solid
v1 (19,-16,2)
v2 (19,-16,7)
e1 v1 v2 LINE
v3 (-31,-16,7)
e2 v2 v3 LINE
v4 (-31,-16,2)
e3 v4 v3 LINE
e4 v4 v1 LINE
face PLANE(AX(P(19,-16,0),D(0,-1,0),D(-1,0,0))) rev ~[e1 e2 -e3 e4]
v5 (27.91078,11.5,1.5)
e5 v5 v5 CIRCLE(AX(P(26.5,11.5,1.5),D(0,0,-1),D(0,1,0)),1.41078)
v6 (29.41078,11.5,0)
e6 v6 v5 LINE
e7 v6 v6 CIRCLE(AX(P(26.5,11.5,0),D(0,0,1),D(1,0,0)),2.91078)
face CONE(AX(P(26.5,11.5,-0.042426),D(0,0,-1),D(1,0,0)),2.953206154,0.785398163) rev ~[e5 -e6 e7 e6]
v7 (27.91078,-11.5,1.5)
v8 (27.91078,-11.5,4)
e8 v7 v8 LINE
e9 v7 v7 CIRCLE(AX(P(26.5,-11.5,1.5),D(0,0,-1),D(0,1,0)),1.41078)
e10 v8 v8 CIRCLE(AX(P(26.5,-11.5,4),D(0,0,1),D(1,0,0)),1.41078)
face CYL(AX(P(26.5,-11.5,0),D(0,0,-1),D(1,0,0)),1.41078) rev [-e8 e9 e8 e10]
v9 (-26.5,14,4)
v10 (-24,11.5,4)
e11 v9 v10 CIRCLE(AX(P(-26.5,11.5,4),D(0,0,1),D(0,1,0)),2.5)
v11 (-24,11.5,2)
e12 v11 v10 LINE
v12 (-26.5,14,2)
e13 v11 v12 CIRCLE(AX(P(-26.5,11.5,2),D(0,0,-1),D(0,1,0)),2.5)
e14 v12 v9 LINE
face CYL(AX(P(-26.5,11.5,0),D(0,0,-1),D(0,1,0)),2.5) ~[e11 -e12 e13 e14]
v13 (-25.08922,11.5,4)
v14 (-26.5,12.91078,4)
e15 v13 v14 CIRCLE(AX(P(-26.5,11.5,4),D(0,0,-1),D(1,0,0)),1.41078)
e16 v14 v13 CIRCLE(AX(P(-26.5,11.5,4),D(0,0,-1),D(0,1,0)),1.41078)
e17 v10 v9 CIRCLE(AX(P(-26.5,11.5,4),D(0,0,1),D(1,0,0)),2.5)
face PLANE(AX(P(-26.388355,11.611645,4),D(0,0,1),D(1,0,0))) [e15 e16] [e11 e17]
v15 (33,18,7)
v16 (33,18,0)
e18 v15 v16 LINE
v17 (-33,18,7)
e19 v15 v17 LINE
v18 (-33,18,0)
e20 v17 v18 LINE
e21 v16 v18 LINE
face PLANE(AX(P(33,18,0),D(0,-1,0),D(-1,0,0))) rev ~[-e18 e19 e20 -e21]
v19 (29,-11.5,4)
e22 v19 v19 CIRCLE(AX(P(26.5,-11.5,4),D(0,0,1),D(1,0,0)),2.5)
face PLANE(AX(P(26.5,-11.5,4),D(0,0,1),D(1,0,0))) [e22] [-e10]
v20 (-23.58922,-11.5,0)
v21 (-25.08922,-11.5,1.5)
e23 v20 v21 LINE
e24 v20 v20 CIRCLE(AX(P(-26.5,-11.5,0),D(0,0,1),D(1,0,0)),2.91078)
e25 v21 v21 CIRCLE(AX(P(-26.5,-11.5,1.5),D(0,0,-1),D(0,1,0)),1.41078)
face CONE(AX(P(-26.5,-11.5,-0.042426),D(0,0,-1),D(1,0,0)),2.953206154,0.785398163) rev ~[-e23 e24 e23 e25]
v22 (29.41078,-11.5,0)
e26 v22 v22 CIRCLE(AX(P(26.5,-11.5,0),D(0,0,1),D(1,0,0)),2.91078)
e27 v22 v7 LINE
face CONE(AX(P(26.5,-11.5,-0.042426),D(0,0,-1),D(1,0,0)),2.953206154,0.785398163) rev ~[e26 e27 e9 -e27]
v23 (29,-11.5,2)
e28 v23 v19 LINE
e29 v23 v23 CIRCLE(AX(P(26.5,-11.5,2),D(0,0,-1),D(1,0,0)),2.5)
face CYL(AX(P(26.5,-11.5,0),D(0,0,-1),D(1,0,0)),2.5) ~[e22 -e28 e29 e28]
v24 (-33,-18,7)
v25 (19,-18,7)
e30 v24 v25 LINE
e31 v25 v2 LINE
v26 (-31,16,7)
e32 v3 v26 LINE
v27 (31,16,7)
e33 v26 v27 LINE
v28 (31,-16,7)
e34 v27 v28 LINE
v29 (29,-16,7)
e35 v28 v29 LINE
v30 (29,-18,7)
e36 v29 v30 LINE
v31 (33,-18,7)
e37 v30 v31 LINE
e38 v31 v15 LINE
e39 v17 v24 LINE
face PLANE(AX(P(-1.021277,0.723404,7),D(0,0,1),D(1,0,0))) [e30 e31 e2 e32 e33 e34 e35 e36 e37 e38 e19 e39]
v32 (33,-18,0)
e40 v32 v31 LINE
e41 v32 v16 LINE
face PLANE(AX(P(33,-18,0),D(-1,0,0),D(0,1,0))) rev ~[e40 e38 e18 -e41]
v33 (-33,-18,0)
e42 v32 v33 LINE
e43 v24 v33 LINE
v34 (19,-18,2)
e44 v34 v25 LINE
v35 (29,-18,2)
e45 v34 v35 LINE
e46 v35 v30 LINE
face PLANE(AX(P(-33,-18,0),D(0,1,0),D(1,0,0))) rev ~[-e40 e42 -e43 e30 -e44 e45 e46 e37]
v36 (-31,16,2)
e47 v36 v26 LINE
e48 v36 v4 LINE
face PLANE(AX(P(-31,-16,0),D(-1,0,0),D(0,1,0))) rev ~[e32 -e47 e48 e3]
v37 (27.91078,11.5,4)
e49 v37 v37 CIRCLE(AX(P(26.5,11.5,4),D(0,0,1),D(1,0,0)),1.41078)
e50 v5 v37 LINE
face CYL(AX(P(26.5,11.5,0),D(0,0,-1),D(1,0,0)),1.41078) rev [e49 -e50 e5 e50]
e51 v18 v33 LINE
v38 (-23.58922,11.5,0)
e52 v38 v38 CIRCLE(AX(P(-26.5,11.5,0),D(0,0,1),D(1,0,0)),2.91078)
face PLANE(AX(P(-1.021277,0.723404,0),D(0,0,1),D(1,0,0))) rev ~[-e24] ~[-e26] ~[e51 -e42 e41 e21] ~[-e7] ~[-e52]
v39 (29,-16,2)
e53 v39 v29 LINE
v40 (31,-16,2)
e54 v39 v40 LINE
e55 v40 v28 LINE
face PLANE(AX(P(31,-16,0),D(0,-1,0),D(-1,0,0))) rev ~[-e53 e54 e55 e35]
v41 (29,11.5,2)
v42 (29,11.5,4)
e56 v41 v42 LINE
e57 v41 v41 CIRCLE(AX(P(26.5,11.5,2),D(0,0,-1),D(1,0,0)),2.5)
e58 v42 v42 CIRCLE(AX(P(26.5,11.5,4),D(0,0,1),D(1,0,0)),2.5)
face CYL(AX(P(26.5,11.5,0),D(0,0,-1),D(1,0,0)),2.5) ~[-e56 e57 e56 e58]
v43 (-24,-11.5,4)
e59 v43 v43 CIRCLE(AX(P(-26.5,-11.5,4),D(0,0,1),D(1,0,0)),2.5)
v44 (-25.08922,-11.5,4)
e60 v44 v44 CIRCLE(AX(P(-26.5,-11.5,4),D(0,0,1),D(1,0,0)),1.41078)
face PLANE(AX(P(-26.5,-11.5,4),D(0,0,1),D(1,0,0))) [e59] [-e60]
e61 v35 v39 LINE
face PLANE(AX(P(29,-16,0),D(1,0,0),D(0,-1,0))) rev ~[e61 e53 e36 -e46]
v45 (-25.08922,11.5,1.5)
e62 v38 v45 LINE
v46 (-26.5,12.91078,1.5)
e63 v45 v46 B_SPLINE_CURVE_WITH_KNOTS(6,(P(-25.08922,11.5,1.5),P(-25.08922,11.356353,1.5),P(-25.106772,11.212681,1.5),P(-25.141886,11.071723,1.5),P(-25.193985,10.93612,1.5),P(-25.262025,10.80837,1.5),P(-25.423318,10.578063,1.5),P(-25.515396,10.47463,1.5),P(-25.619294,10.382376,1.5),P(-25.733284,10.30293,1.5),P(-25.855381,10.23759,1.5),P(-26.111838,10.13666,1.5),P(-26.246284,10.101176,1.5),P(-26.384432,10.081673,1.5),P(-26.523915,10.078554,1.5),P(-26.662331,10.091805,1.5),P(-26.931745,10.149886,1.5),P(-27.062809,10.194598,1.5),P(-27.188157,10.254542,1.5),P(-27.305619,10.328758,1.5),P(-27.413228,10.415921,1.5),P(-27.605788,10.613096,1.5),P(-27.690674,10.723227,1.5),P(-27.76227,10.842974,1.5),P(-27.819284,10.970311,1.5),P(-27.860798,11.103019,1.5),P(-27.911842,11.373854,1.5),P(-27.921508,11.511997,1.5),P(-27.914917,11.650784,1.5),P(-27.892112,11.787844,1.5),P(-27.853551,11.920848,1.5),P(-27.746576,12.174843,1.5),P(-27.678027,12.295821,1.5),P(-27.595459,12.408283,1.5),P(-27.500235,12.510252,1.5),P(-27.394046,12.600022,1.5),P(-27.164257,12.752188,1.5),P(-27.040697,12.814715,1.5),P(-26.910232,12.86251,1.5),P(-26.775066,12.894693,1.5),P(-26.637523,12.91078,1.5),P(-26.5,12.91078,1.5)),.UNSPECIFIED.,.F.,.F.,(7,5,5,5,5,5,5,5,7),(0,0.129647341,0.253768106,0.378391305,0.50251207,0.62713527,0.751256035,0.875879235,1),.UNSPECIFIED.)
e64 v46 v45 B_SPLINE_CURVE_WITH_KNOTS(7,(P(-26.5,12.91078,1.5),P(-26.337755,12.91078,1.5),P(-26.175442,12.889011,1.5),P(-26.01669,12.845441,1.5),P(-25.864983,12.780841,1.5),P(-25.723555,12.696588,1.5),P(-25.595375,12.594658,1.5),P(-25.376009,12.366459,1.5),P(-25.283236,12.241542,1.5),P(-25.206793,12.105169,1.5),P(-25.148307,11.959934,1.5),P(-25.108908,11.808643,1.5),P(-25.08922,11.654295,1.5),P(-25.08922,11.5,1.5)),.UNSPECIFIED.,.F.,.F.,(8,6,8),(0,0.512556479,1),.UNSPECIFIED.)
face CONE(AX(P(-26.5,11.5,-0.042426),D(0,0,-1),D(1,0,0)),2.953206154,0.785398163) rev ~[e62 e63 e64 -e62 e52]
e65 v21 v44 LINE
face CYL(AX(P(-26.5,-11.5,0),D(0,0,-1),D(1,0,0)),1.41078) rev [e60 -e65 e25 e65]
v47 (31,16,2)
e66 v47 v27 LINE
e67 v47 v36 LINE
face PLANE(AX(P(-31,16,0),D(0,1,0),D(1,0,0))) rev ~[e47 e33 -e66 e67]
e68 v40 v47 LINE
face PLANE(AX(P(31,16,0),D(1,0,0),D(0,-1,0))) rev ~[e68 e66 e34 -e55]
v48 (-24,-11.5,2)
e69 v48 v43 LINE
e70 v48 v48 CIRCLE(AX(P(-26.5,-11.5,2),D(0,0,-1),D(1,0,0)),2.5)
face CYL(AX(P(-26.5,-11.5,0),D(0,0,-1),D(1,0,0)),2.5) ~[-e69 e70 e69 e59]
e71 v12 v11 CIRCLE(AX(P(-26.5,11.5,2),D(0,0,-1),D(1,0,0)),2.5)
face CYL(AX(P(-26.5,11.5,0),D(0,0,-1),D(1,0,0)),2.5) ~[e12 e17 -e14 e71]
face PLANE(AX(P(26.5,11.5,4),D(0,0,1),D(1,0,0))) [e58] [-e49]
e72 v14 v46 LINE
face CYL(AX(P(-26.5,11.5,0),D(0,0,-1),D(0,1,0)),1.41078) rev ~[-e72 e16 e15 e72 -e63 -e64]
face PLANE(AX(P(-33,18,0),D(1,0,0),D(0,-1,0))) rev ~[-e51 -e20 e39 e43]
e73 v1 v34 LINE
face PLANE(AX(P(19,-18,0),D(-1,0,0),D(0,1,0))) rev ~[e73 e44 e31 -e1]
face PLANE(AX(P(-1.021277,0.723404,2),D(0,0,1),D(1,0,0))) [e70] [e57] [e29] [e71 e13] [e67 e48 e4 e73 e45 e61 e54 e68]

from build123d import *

# Parameters (mm, degrees)
F0_R     = 2.5
F0_R_2   = 1.4107797467
F0_W     = 10
F0_H     = 2
F1_DEPTH = 2
F2_DEPTH = 4
F3_DEPTH = 7


# Not quite as in the source:
# - a fillet or chamfer that OpenCascade refuses, or shapes differently, is made with other operations: its cross-section is extruded or revolved along the edge and cut away or added


with BuildPart() as f1:
    # F0 (on Top) → F1 (new body)
    with BuildSketch(Plane.XY):
        Polygon((19, -18), (19, -16), (10.7328139991, -16), (-31, -16), (-31, 16), (31, 16), (31, -16), (29, -16), (29, -18), (33, -18), (33, 18), (-33, 18), (-33, -18), align=None)
        Polygon((-30, -15), (-30, 15), (-26.5, 15), (30, 15), (30, -15), (29, -15), (29, -16), (31, -16), (31, 16), (-31, 16), (-31, -16), (10.7328139991, -16), (19, -16), (19, -15), align=None)
        Polygon((-26.5, 15), (-30, 15), (-30, -15), (19, -15), (24, -15), (29, -15), (30, -15), (30, 15), align=None)
        with Locations((-26.5, -11.5)):
            Circle(F0_R, mode=Mode.SUBTRACT)
        with Locations((26.5, -11.5)):
            Circle(F0_R, mode=Mode.SUBTRACT)
        with BuildLine():
            ThreePointArc((-24, 11.5), (-28.267766953, 9.732233047), (-26.5, 14))
            ThreePointArc((-26.5, 14), (-24.732233047, 13.267766953), (-24, 11.5))
        make_face(mode=Mode.SUBTRACT)
        with Locations((26.5, 11.5)):
            Circle(F0_R, mode=Mode.SUBTRACT)
        with BuildLine():
            ThreePointArc((-24, 11.5), (-24.732233047, 13.267766953), (-26.5, 14))
            ThreePointArc((-26.5, 14), (-28.267766953, 9.732233047), (-24, 11.5))
        make_face()
        with BuildLine():
            ThreePointArc((-25.0892202533, 11.5), (-27.4975719256, 10.5024280744), (-26.5, 12.9107797467))
            ThreePointArc((-26.5, 12.9107797467), (-25.5024280744, 12.4975719256), (-25.0892202533, 11.5))
        make_face(mode=Mode.SUBTRACT)
        with Locations((-26.5, -11.5)):
            Circle(F0_R)
        with Locations((-26.5, -11.5)):
            Circle(F0_R_2, mode=Mode.SUBTRACT)
        with Locations((26.5, -11.5)):
            Circle(F0_R)
        with Locations((26.5, -11.5)):
            Circle(F0_R_2, mode=Mode.SUBTRACT)
        with Locations((26.5, 11.5)):
            Circle(F0_R)
        with Locations((26.5, 11.5)):
            Circle(F0_R_2, mode=Mode.SUBTRACT)
        Polygon((24, -15), (19, -15), (19, -16), (29, -16), (29, -15), align=None)
        with Locations((24, -17)):
            Rectangle(F0_W, F0_H)
    extrude(amount=F1_DEPTH)

    # F0 (on Top) → F2 (join)
    with BuildSketch(Plane.XY):
        with Locations((-26.5, -11.5)):
            Circle(F0_R)
        with Locations((-26.5, -11.5)):
            Circle(F0_R_2, mode=Mode.SUBTRACT)
        with BuildLine():
            ThreePointArc((-24, 11.5), (-24.732233047, 13.267766953), (-26.5, 14))
            ThreePointArc((-26.5, 14), (-28.267766953, 9.732233047), (-24, 11.5))
        make_face()
        with BuildLine():
            ThreePointArc((-25.0892202533, 11.5), (-27.4975719256, 10.5024280744), (-26.5, 12.9107797467))
            ThreePointArc((-26.5, 12.9107797467), (-25.5024280744, 12.4975719256), (-25.0892202533, 11.5))
        make_face(mode=Mode.SUBTRACT)
        with Locations((26.5, -11.5)):
            Circle(F0_R)
        with Locations((26.5, -11.5)):
            Circle(F0_R_2, mode=Mode.SUBTRACT)
        with Locations((26.5, 11.5)):
            Circle(F0_R)
        with Locations((26.5, 11.5)):
            Circle(F0_R_2, mode=Mode.SUBTRACT)
    extrude(amount=F2_DEPTH)

    # F0 (on Top) → F3 (join)
    with BuildSketch(Plane.XY):
        Polygon((19, -18), (19, -16), (10.7328139991, -16), (-31, -16), (-31, 16), (31, 16), (31, -16), (29, -16), (29, -18), (33, -18), (33, 18), (-33, 18), (-33, -18), align=None)
    extrude(amount=F3_DEPTH)

    # F4: chamfer of 1.5 on 4 edges, made by hand

    # F4_s1 → F4_t2 (revolve, cut)
    with BuildSketch(Plane.XZ.offset(11.5)):
        with BuildLine():
            Line((29.4532061535, -0.0424264069), (27.8683533398, 1.5424264069))
            Line((27.8683533398, 1.5424264069), (27.8383533398, 1.5424264069))
            ThreePointArc((27.8383533398, 1.5424264069), (27.8807797467, 0.7712132034), (27.8807797467, 0))
            Line((27.8807797467, 0), (27.9107797467, -0.03))
            ThreePointArc((27.9107797467, -0.03), (28.6819929501, -0.03), (29.4532061535, -0.0724264069))
            Line((29.4532061535, -0.0724264069), (29.4532061535, -0.0424264069))
        make_face()
    revolve(axis=Axis((26.5, -11.5, 0), (0, 0, 1)), mode=Mode.SUBTRACT)

    # F4_s3 → F4_t4 (revolve, cut)
    with BuildSketch(Plane.XZ.offset(-11.5)):
        with BuildLine():
            Line((29.4532061535, -0.0424264069), (27.8683533398, 1.5424264069))
            Line((27.8683533398, 1.5424264069), (27.8383533398, 1.5424264069))
            ThreePointArc((27.8383533398, 1.5424264069), (27.8807797467, 0.7712132034), (27.8807797467, 0))
            Line((27.8807797467, 0), (27.9107797467, -0.03))
            ThreePointArc((27.9107797467, -0.03), (28.6819929501, -0.03), (29.4532061535, -0.0724264069))
            Line((29.4532061535, -0.0724264069), (29.4532061535, -0.0424264069))
        make_face()
    revolve(axis=Axis((26.5, 11.5, 0), (0, 0, 1)), mode=Mode.SUBTRACT)

    # F4_s5 → F4_t6 (revolve, cut)
    with BuildSketch(Plane.XZ.offset(-11.5)):
        with BuildLine():
            Line((-23.5467938465, -0.0424264069), (-25.1316466602, 1.5424264069))
            Line((-25.1316466602, 1.5424264069), (-25.1616466602, 1.5424264069))
            ThreePointArc((-25.1616466602, 1.5424264069), (-25.1192202533, 0.7712132034), (-25.1192202533, 0))
            Line((-25.1192202533, 0), (-25.0892202533, -0.03))
            ThreePointArc((-25.0892202533, -0.03), (-24.3180070499, -0.03), (-23.5467938465, -0.0724264069))
            Line((-23.5467938465, -0.0724264069), (-23.5467938465, -0.0424264069))
        make_face()
    revolve(axis=Axis((-26.5, 11.5, 0), (0, 0, 1)), mode=Mode.SUBTRACT)

    # F4_s7 → F4_t8 (revolve, cut)
    with BuildSketch(Plane.XZ.offset(11.5)):
        with BuildLine():
            Line((-23.5467938465, -0.0424264069), (-25.1316466602, 1.5424264069))
            Line((-25.1316466602, 1.5424264069), (-25.1616466602, 1.5424264069))
            ThreePointArc((-25.1616466602, 1.5424264069), (-25.1192202533, 0.7712132034), (-25.1192202533, 0))
            Line((-25.1192202533, 0), (-25.0892202533, -0.03))
            ThreePointArc((-25.0892202533, -0.03), (-24.3180070499, -0.03), (-23.5467938465, -0.0724264069))
            Line((-23.5467938465, -0.0724264069), (-23.5467938465, -0.0424264069))
        make_face()
    revolve(axis=Axis((-26.5, -11.5, 0), (0, 0, 1)), mode=Mode.SUBTRACT)


solid = f1.part
